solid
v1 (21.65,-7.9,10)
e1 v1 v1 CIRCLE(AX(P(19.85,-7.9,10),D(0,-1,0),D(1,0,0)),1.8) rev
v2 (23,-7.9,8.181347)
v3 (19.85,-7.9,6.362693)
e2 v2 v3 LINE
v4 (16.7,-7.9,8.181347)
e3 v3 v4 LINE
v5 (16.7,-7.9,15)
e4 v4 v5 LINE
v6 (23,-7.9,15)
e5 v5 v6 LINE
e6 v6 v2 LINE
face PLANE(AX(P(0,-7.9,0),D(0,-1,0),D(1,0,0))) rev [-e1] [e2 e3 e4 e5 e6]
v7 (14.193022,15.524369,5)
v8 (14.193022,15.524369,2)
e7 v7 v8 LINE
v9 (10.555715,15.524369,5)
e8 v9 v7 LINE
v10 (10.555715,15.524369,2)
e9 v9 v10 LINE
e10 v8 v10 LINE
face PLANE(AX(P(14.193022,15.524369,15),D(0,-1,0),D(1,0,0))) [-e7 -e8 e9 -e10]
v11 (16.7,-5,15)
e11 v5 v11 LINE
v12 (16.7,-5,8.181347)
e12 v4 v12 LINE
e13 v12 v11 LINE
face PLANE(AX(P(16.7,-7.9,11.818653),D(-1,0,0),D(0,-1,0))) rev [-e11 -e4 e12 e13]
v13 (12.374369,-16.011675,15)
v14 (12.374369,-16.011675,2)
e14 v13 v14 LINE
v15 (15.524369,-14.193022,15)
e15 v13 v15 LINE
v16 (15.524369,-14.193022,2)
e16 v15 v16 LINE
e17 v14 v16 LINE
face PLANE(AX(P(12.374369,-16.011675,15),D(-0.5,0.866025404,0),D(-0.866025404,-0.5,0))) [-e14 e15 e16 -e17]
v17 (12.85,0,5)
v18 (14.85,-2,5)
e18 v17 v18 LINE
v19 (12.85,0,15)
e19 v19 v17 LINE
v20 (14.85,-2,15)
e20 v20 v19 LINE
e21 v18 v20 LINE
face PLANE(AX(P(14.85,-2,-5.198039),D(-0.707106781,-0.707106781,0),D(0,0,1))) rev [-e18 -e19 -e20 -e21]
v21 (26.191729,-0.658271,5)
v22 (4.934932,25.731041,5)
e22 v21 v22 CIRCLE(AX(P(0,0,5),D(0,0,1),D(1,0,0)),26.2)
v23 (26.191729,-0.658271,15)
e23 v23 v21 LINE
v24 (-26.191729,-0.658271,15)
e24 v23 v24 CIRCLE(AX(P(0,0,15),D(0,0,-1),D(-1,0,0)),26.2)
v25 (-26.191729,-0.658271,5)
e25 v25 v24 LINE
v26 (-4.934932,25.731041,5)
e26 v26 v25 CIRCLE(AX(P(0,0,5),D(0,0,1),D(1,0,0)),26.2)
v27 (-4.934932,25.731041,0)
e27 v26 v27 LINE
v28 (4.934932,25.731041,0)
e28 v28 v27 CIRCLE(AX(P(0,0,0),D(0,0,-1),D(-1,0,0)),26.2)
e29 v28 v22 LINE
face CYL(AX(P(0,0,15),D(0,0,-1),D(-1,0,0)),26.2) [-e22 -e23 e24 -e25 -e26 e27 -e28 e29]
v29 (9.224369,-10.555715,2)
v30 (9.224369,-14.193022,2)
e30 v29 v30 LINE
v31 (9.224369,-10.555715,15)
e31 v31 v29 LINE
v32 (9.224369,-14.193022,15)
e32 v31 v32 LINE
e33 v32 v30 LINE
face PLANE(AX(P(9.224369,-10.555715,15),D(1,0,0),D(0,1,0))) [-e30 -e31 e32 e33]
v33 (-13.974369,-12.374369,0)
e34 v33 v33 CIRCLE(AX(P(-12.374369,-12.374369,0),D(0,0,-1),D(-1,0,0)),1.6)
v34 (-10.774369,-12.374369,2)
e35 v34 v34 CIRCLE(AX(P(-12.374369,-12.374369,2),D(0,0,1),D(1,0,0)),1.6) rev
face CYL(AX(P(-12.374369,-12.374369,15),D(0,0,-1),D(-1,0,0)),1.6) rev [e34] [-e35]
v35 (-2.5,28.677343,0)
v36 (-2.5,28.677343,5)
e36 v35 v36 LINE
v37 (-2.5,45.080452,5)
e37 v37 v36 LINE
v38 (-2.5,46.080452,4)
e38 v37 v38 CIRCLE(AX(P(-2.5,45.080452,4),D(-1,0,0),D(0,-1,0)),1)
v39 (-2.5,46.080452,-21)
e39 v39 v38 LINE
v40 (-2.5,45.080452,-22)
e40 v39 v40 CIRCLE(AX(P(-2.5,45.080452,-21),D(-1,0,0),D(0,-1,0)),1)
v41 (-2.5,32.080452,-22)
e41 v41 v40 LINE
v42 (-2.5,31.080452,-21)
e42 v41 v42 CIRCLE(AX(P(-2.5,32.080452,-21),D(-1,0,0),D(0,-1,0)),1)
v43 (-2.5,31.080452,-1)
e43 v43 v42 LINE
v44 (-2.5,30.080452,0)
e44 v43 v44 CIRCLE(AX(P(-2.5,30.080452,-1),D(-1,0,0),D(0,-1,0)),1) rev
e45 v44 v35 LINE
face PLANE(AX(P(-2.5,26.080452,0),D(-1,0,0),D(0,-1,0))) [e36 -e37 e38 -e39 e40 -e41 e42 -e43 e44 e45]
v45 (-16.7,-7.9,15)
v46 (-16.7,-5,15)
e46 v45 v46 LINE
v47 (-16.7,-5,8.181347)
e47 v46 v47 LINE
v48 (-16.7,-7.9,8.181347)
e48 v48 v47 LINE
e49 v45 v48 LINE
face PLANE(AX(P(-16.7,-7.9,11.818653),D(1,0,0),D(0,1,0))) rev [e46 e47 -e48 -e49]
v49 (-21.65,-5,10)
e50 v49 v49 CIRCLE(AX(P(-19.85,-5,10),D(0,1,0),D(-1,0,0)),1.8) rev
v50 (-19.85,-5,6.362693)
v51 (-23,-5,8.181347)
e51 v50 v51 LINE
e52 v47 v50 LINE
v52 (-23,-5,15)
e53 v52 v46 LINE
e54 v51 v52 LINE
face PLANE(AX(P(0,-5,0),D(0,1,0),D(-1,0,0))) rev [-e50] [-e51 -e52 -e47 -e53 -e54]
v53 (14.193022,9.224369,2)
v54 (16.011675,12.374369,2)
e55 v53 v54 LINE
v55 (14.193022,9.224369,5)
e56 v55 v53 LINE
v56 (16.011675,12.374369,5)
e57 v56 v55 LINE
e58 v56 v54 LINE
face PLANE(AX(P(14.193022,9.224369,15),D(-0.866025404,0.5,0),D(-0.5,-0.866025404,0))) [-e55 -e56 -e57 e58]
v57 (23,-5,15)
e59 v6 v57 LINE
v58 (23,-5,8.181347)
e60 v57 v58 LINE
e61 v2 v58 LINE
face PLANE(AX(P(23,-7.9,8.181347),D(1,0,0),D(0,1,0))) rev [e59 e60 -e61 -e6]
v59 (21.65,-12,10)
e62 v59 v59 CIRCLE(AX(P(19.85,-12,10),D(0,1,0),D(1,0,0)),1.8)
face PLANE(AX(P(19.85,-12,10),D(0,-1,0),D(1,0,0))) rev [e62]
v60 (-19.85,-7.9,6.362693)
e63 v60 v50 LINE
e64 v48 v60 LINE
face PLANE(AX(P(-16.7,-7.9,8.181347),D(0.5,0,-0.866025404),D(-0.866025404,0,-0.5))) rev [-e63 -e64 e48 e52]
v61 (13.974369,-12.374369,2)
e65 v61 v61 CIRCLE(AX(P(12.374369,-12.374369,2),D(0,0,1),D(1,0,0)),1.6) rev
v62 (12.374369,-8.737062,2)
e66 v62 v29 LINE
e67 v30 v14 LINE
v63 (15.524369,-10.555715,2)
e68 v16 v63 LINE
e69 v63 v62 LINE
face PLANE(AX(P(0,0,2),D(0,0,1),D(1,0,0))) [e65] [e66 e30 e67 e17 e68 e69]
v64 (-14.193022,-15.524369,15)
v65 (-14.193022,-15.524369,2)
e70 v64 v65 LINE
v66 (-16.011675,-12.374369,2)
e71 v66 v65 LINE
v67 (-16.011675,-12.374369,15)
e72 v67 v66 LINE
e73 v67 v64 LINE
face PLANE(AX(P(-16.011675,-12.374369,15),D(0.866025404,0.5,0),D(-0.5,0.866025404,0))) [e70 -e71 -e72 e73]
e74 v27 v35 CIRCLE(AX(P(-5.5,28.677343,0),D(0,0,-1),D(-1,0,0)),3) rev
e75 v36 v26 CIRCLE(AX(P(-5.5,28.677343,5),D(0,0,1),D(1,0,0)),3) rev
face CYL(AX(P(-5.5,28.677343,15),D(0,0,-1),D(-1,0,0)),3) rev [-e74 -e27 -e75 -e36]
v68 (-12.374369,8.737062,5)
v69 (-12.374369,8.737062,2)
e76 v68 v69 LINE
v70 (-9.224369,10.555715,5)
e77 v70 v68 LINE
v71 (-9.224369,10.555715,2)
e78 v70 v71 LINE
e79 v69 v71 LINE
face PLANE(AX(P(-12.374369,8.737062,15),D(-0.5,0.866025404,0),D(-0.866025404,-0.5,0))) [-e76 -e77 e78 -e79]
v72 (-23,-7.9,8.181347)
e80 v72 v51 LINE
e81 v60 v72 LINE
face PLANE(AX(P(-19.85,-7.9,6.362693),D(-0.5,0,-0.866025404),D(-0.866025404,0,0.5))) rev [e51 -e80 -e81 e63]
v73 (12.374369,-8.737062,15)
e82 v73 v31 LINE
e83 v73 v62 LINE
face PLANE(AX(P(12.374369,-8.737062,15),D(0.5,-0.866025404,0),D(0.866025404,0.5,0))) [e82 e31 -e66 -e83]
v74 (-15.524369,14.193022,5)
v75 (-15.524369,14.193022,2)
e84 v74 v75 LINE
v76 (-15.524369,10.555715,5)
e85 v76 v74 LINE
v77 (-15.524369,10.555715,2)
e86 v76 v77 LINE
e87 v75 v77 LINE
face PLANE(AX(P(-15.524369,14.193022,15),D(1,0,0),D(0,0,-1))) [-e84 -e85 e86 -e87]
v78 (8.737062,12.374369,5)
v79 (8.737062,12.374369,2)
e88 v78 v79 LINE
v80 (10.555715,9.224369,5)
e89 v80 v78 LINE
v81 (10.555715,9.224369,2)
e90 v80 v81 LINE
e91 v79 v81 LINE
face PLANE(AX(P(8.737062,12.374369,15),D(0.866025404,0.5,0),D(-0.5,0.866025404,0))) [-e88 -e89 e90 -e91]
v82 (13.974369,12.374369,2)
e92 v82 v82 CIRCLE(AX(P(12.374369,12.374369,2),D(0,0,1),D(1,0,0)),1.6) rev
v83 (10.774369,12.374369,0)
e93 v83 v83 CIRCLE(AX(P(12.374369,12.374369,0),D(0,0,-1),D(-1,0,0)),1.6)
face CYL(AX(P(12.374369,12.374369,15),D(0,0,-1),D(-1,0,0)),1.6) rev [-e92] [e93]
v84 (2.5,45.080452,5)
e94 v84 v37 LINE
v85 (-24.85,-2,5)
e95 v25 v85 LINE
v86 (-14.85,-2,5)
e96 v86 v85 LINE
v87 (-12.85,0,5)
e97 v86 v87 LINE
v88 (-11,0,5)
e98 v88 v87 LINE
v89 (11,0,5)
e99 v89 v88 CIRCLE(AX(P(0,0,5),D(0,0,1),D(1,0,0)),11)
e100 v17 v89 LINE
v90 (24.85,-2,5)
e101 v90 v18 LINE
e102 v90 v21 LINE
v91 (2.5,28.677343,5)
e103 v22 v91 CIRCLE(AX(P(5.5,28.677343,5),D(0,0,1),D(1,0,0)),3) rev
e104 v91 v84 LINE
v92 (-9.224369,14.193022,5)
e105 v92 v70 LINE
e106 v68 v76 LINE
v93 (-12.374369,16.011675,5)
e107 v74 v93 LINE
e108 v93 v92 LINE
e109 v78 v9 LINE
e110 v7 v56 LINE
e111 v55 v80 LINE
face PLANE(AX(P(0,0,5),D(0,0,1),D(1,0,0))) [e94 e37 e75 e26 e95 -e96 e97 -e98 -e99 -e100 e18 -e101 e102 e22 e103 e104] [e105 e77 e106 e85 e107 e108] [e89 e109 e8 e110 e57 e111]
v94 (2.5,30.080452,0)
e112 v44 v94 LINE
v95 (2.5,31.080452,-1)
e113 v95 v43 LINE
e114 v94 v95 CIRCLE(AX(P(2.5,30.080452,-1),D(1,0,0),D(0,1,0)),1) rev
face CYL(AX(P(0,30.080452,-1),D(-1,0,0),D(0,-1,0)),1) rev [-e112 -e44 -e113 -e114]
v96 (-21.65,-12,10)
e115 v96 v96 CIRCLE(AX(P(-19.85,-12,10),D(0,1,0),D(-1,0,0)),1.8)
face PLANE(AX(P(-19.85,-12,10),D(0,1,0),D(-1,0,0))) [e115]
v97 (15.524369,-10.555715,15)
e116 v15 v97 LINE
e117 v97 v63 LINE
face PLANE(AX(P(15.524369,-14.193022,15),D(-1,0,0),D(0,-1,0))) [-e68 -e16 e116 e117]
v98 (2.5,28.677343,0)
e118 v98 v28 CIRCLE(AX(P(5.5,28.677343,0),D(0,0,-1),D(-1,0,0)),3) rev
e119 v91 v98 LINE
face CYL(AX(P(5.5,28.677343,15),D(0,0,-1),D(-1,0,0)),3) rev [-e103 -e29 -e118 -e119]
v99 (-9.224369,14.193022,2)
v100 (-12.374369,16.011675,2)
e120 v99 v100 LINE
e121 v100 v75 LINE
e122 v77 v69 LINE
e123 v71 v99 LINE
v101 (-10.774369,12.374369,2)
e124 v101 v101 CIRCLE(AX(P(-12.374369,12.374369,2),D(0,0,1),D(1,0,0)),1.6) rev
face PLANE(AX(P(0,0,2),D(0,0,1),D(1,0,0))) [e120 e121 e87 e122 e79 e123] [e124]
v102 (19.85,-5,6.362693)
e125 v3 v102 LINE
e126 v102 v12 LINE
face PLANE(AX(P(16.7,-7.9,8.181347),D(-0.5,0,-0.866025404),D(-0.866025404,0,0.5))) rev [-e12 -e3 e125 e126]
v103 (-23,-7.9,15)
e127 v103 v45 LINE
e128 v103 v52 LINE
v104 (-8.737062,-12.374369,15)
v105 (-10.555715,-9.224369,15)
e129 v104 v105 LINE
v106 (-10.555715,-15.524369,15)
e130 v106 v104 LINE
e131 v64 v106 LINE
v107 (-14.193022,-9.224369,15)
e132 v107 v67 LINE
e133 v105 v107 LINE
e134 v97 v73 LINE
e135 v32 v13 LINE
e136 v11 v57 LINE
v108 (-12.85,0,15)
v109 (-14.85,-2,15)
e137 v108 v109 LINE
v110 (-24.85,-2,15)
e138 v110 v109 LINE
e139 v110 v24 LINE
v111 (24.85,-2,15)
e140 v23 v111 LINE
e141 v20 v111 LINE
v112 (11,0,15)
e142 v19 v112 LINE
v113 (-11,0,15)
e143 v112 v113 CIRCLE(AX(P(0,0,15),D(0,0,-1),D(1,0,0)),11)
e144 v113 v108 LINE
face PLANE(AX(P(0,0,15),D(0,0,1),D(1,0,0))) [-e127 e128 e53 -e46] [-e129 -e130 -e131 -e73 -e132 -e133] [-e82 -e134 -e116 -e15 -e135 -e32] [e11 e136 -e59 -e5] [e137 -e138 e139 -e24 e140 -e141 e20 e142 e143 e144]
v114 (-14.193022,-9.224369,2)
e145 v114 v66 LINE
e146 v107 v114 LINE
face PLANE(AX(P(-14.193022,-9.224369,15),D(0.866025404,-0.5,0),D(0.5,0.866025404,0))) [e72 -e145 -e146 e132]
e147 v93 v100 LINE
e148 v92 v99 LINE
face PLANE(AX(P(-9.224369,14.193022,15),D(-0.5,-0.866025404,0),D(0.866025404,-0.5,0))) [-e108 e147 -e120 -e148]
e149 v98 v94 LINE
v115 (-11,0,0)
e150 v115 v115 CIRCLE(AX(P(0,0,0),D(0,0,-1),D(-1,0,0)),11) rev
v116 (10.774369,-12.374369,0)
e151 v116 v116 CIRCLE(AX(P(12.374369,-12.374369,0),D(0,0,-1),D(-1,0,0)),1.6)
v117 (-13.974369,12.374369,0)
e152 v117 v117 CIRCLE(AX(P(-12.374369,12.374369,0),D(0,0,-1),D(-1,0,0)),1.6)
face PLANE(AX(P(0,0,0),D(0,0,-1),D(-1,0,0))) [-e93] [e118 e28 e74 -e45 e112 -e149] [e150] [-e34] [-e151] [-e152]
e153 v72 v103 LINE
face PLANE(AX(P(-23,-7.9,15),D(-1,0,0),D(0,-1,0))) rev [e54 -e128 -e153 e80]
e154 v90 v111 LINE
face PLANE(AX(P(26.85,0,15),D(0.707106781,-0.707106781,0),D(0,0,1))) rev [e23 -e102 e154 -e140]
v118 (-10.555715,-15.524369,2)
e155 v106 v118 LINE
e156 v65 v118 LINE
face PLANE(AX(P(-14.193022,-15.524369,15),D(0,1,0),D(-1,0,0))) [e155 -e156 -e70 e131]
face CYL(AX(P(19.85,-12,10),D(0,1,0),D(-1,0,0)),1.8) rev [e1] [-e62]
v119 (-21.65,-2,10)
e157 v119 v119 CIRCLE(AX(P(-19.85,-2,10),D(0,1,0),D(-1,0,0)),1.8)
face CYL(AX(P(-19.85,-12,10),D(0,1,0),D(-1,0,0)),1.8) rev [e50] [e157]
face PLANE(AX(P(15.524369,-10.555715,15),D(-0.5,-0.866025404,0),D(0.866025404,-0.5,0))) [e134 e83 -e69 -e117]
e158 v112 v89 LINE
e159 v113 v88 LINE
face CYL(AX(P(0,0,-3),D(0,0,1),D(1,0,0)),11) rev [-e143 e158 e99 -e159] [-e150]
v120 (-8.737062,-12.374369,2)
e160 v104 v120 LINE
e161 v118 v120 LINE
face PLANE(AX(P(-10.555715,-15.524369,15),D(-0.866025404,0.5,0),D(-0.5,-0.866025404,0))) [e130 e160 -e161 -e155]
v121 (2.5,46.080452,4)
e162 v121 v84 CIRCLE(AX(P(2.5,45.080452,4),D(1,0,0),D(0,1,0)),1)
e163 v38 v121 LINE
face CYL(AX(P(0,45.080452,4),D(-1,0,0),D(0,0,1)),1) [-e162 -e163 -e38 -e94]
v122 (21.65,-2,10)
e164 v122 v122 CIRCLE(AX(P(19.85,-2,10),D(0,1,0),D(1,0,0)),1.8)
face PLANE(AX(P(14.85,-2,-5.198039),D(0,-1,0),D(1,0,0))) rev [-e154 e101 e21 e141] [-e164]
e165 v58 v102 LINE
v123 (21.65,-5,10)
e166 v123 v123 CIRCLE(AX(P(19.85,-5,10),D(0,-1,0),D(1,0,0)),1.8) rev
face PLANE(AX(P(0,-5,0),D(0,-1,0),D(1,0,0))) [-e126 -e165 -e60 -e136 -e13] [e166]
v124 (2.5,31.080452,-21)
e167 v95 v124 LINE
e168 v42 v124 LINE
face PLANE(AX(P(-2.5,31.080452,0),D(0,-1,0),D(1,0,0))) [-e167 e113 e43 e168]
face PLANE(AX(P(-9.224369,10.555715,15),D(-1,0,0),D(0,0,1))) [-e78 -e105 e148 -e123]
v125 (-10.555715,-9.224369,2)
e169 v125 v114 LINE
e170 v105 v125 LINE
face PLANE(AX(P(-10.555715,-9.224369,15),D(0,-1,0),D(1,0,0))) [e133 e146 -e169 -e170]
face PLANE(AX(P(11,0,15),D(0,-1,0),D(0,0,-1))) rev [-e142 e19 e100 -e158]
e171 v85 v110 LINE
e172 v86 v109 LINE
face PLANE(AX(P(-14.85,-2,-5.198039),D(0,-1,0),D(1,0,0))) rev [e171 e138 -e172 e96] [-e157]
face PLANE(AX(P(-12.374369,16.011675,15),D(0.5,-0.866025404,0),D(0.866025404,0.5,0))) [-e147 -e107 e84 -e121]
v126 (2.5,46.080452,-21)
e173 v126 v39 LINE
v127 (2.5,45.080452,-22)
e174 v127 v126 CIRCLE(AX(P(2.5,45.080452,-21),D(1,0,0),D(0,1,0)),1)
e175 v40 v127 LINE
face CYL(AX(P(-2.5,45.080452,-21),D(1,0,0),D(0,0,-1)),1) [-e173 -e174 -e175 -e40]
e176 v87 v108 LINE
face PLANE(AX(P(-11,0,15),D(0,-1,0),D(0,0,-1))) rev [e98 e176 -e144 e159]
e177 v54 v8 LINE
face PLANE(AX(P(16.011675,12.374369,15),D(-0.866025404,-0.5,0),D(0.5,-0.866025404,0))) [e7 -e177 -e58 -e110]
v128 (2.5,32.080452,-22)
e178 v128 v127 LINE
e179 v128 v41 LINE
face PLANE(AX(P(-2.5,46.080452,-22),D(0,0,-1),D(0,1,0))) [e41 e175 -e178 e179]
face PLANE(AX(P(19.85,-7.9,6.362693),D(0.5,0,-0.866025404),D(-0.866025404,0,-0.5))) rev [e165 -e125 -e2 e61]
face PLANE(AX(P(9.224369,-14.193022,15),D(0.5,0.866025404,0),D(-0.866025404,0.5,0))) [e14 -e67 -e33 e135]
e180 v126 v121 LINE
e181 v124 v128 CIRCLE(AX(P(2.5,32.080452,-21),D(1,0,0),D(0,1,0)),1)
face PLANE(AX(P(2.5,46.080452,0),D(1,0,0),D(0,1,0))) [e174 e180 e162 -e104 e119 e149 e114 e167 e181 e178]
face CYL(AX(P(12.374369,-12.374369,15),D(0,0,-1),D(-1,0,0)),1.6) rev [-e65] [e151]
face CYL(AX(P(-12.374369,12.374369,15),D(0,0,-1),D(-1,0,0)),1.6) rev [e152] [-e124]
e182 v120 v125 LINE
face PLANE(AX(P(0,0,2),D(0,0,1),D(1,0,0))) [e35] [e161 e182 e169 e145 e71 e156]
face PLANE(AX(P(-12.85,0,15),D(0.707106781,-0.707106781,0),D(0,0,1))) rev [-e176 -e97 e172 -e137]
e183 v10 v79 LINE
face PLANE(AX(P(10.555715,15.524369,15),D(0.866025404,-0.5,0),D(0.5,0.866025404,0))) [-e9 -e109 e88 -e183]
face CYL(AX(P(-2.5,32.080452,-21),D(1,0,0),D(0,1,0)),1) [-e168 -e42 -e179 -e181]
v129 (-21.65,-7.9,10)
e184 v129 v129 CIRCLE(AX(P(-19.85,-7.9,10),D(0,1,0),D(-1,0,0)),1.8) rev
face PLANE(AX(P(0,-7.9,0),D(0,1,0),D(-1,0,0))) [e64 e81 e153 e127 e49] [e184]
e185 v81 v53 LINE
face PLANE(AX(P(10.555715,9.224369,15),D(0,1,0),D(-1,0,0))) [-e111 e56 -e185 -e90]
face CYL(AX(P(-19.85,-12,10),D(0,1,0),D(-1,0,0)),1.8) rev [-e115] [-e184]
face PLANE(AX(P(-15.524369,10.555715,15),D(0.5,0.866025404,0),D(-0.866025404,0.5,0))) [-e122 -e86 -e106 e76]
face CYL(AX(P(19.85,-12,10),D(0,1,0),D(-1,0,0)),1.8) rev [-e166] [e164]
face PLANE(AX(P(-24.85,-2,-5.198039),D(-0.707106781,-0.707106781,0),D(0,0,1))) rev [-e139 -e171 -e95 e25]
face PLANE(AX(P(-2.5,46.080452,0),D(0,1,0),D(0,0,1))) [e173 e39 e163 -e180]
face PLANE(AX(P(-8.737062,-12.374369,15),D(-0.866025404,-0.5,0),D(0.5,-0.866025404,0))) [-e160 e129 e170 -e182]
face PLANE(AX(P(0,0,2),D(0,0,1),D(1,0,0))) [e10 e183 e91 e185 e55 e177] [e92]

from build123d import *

# Parameters (mm, degrees)
ESBO_O1_R                = 28.7
RESSALTO_EXTRUS_O1_DEPTH = 5
ESBO_O2_R                = 11
CORTE_EXTRUS_O1_DEPTH    = 8
ESBO_O3_R                = 7.5
CORTE_EXTRUS_O2_DEPTH    = 42.801674608
RESSALTO_EXTRUS_O4_START = 10
RESSALTO_EXTRUS_O4_DEPTH = 10
ESBO_O9_W                = 10
ESBO_O9_H                = 2
CORTE_EXTRUS_O5_DEPTH    = 10
CHANFRO1_SIZE            = 2
ESBO_O10_R               = 1.8
CORTE_EXTRUS_O6_DEPTH    = 10
CORTE_EXTRUS_O7_START    = -3
CORTE_EXTRUS_O7_DEPTH    = 2.9
CORTE_EXTRUS_O8_START    = -5
ESBO_O13_R               = 28.7
CORTE_EXTRUS_O8_DEPTH    = 5
ESBO_O14_R               = 28.7
ESBO_O14_R_2             = 26.2
CORTE_EXTRUS_O9_DEPTH    = 44.271006459
ESBO_O15_R               = 1.6
CORTE_EXTRUS_O10_DEPTH   = 40.973491216
CORTE_EXTRUS_O11_START   = -3
CORTE_EXTRUS_O11_DEPTH   = 42.378118766
RESSALTO_EXTRUS_O5_START = -5
RESSALTO_EXTRUS_O5_DEPTH = 5
ESBO_O19_W               = 22
ESBO_O19_H               = 15
RESSALTO_EXTRUS_O6_DEPTH = 5
FILETE1_R                = 3
FILETE2_R                = 1
FILETE3_R                = 1


with BuildPart() as part:
    # Esboço1 → Ressalto-extrusão1 (new, symmetric)
    with BuildSketch(Plane.XY):
        Circle(ESBO_O1_R)
    extrude(amount=RESSALTO_EXTRUS_O1_DEPTH, both=True)

    # Esboço2 → Corte-extrusão1 (cut)
    with BuildSketch(Plane.XY.offset(5)):
        Circle(ESBO_O2_R)
    extrude(amount=-CORTE_EXTRUS_O1_DEPTH, mode=Mode.SUBTRACT)

    # Esboço3 → Corte-extrusão2 (cut, through all)
    with BuildSketch(Plane(origin=(0, 0, -5), x_dir=(-1, 0, 0), z_dir=(0, 0, -1))):
        Circle(ESBO_O3_R)
    extrude(amount=-CORTE_EXTRUS_O2_DEPTH, mode=Mode.SUBTRACT)

    # Esboço8 → Ressalto-extrusão4 (add)
    with BuildSketch(Plane.XY.offset(5).offset(RESSALTO_EXTRUS_O4_START)):
        with BuildLine():
            Line((-11, 0), (-28.7, 0))
            ThreePointArc((-28.7, 0), (0, -28.7), (28.7, 0))
            Line((28.7, 0), (11, 0))
            ThreePointArc((11, 0), (0, -11), (-11, 0))
        make_face()
    extrude(amount=-RESSALTO_EXTRUS_O4_DEPTH)

    # Esboço9 → Corte-extrusão5 (cut)
    with BuildSketch(Plane.XY.offset(15)):
        with Locations((-19.85, -1)):
            Rectangle(ESBO_O9_W, ESBO_O9_H)
        with Locations((19.85, -1)):
            Rectangle(ESBO_O9_W, ESBO_O9_H)
    extrude(amount=-CORTE_EXTRUS_O5_DEPTH, mode=Mode.SUBTRACT)

    # Chanfro1
    chanfro1_edges = [part.edges().sort_by_distance(p)[0] for p in [
        (24.85, 0, 10),
        (14.85, 0, 10),
        (-14.85, 0, 10),
        (-24.85, 0, 10),
    ]]
    chamfer(chanfro1_edges, length=CHANFRO1_SIZE - 0.0001)  # a hair under: the kernel refuses the full size

    # Esboço10 → Corte-extrusão6 (cut)
    with BuildSketch(Plane(origin=(0, -2, 0), x_dir=(1, 0, 0), z_dir=(0, 1, 0))):
        with Locations(Location((-19.85, -10, 0), (0, 0, 180))):
            Circle(ESBO_O10_R)
        with Locations((19.85, -10)):
            Circle(ESBO_O10_R)
    extrude(amount=-CORTE_EXTRUS_O6_DEPTH, mode=Mode.SUBTRACT)

    # Esboço11 → Corte-extrusão7 (cut)
    with BuildSketch(Plane(origin=(0, -2, 0), x_dir=(1, 0, 0), z_dir=(0, 1, 0)).offset(CORTE_EXTRUS_O7_START)):
        Polygon((-23, -8.181346652), (-23, -11.818653348), (-23, -15), (-16.7, -15), (-16.7, -11.818653348), (-16.7, -8.181346652), (-19.85, -6.362693304), align=None)
        Polygon((23, -15), (23, -11.818653348), (23, -8.181346652), (19.85, -6.362693304), (16.7, -8.181346652), (16.7, -11.818653348), (16.7, -15), align=None)
    extrude(amount=-CORTE_EXTRUS_O7_DEPTH, mode=Mode.SUBTRACT)

    # Esboço13 → Corte-extrusão8 (cut)
    with BuildSketch(Plane(origin=(0, 0, -5), x_dir=(-1, 0, 0), z_dir=(0, 0, -1)).offset(CORTE_EXTRUS_O8_START)):
        Circle(ESBO_O13_R)
    extrude(amount=CORTE_EXTRUS_O8_DEPTH, mode=Mode.SUBTRACT)

    # Esboço14 → Corte-extrusão9 (cut, through all)
    with BuildSketch(Plane(origin=(0, 0, 0), x_dir=(-1, 0, 0), z_dir=(0, 0, -1))):
        Circle(ESBO_O14_R)
        Circle(ESBO_O14_R_2, mode=Mode.SUBTRACT)
    extrude(amount=-CORTE_EXTRUS_O9_DEPTH, mode=Mode.SUBTRACT)

    # Esboço15 → Corte-extrusão10 (cut, through all)
    with BuildSketch(Plane(origin=(0, 0, 0), x_dir=(-1, 0, 0), z_dir=(0, 0, -1))):
        with Locations((-12.374368671, 12.374368671)):
            Circle(ESBO_O15_R)
        with Locations((12.374368671, 12.374368671)):
            Circle(ESBO_O15_R)
        with Locations((12.374368671, -12.374368671)):
            Circle(ESBO_O15_R)
        with Locations((-12.374368671, -12.374368671)):
            Circle(ESBO_O15_R)
    extrude(amount=-CORTE_EXTRUS_O10_DEPTH, mode=Mode.SUBTRACT)

    # Esboço17 → Corte-extrusão11 (cut, through all)
    with BuildSketch(Plane.XY.offset(5).offset(CORTE_EXTRUS_O11_START)):
        Polygon((-15.524368671, 14.193022019), (-15.524368671, 10.555715323), (-12.374368671, 8.737061975), (-9.224368671, 10.555715323), (-9.224368671, 14.193022019), (-12.374368671, 16.011675367), align=None)
        Polygon((16.011675367, 12.374368671), (14.193022019, 15.524368671), (10.555715323, 15.524368671), (8.737061975, 12.374368671), (10.555715323, 9.224368671), (14.193022019, 9.224368671), align=None)
        Polygon((12.374368671, -16.011675367), (15.524368671, -14.193022019), (15.524368671, -10.555715323), (12.374368671, -8.737061975), (9.224368671, -10.555715323), (9.224368671, -14.193022019), align=None)
        Polygon((-16.011675367, -12.374368671), (-14.193022019, -15.524368671), (-10.555715323, -15.524368671), (-8.737061975, -12.374368671), (-10.555715323, -9.224368671), (-14.193022019, -9.224368671), align=None)
    extrude(amount=CORTE_EXTRUS_O11_DEPTH, mode=Mode.SUBTRACT)

    # Esboço18 → Ressalto-extrusão5 (add)
    with BuildSketch(Plane.XY.offset(5).offset(RESSALTO_EXTRUS_O5_START)):
        with BuildLine():
            Line((-2.5, 26.08045245), (-2.5, 46.08045245))
            Line((-2.5, 46.08045245), (2.5, 46.08045245))
            Line((2.5, 46.08045245), (2.5, 26.08045245))
            ThreePointArc((2.5, 26.08045245), (0, 26.2), (-2.5, 26.08045245))
        make_face()
    extrude(amount=RESSALTO_EXTRUS_O5_DEPTH)

    # Esboço19 → Ressalto-extrusão6 (add)
    with BuildSketch(Plane(origin=(2.5, 0, 0), x_dir=(0, 0, -1), z_dir=(1, 0, 0))):
        with Locations((11, 38.58045245)):
            Rectangle(ESBO_O19_W, ESBO_O19_H)
    extrude(amount=-RESSALTO_EXTRUS_O6_DEPTH)

    # Filete1
    filete1_edges = [part.edges().sort_by_distance(p)[0] for p in [
        (2.5, 26.08045245, 2.5),
        (-2.5, 26.08045245, 2.5),
    ]]
    fillet(filete1_edges, radius=FILETE1_R)

    # Filete2
    filete2_edges = [part.edges().sort_by_distance(p)[0] for p in [
        (0, 31.08045245, 0),
    ]]
    fillet(filete2_edges, radius=FILETE2_R)

    # Filete3
    filete3_edges = [part.edges().sort_by_distance(p)[0] for p in [
        (0, 46.08045245, 5),
        (0, 46.08045245, -22),
        (0, 31.08045245, -22),
    ]]
    fillet(filete3_edges, radius=FILETE3_R)


solid = part.part
